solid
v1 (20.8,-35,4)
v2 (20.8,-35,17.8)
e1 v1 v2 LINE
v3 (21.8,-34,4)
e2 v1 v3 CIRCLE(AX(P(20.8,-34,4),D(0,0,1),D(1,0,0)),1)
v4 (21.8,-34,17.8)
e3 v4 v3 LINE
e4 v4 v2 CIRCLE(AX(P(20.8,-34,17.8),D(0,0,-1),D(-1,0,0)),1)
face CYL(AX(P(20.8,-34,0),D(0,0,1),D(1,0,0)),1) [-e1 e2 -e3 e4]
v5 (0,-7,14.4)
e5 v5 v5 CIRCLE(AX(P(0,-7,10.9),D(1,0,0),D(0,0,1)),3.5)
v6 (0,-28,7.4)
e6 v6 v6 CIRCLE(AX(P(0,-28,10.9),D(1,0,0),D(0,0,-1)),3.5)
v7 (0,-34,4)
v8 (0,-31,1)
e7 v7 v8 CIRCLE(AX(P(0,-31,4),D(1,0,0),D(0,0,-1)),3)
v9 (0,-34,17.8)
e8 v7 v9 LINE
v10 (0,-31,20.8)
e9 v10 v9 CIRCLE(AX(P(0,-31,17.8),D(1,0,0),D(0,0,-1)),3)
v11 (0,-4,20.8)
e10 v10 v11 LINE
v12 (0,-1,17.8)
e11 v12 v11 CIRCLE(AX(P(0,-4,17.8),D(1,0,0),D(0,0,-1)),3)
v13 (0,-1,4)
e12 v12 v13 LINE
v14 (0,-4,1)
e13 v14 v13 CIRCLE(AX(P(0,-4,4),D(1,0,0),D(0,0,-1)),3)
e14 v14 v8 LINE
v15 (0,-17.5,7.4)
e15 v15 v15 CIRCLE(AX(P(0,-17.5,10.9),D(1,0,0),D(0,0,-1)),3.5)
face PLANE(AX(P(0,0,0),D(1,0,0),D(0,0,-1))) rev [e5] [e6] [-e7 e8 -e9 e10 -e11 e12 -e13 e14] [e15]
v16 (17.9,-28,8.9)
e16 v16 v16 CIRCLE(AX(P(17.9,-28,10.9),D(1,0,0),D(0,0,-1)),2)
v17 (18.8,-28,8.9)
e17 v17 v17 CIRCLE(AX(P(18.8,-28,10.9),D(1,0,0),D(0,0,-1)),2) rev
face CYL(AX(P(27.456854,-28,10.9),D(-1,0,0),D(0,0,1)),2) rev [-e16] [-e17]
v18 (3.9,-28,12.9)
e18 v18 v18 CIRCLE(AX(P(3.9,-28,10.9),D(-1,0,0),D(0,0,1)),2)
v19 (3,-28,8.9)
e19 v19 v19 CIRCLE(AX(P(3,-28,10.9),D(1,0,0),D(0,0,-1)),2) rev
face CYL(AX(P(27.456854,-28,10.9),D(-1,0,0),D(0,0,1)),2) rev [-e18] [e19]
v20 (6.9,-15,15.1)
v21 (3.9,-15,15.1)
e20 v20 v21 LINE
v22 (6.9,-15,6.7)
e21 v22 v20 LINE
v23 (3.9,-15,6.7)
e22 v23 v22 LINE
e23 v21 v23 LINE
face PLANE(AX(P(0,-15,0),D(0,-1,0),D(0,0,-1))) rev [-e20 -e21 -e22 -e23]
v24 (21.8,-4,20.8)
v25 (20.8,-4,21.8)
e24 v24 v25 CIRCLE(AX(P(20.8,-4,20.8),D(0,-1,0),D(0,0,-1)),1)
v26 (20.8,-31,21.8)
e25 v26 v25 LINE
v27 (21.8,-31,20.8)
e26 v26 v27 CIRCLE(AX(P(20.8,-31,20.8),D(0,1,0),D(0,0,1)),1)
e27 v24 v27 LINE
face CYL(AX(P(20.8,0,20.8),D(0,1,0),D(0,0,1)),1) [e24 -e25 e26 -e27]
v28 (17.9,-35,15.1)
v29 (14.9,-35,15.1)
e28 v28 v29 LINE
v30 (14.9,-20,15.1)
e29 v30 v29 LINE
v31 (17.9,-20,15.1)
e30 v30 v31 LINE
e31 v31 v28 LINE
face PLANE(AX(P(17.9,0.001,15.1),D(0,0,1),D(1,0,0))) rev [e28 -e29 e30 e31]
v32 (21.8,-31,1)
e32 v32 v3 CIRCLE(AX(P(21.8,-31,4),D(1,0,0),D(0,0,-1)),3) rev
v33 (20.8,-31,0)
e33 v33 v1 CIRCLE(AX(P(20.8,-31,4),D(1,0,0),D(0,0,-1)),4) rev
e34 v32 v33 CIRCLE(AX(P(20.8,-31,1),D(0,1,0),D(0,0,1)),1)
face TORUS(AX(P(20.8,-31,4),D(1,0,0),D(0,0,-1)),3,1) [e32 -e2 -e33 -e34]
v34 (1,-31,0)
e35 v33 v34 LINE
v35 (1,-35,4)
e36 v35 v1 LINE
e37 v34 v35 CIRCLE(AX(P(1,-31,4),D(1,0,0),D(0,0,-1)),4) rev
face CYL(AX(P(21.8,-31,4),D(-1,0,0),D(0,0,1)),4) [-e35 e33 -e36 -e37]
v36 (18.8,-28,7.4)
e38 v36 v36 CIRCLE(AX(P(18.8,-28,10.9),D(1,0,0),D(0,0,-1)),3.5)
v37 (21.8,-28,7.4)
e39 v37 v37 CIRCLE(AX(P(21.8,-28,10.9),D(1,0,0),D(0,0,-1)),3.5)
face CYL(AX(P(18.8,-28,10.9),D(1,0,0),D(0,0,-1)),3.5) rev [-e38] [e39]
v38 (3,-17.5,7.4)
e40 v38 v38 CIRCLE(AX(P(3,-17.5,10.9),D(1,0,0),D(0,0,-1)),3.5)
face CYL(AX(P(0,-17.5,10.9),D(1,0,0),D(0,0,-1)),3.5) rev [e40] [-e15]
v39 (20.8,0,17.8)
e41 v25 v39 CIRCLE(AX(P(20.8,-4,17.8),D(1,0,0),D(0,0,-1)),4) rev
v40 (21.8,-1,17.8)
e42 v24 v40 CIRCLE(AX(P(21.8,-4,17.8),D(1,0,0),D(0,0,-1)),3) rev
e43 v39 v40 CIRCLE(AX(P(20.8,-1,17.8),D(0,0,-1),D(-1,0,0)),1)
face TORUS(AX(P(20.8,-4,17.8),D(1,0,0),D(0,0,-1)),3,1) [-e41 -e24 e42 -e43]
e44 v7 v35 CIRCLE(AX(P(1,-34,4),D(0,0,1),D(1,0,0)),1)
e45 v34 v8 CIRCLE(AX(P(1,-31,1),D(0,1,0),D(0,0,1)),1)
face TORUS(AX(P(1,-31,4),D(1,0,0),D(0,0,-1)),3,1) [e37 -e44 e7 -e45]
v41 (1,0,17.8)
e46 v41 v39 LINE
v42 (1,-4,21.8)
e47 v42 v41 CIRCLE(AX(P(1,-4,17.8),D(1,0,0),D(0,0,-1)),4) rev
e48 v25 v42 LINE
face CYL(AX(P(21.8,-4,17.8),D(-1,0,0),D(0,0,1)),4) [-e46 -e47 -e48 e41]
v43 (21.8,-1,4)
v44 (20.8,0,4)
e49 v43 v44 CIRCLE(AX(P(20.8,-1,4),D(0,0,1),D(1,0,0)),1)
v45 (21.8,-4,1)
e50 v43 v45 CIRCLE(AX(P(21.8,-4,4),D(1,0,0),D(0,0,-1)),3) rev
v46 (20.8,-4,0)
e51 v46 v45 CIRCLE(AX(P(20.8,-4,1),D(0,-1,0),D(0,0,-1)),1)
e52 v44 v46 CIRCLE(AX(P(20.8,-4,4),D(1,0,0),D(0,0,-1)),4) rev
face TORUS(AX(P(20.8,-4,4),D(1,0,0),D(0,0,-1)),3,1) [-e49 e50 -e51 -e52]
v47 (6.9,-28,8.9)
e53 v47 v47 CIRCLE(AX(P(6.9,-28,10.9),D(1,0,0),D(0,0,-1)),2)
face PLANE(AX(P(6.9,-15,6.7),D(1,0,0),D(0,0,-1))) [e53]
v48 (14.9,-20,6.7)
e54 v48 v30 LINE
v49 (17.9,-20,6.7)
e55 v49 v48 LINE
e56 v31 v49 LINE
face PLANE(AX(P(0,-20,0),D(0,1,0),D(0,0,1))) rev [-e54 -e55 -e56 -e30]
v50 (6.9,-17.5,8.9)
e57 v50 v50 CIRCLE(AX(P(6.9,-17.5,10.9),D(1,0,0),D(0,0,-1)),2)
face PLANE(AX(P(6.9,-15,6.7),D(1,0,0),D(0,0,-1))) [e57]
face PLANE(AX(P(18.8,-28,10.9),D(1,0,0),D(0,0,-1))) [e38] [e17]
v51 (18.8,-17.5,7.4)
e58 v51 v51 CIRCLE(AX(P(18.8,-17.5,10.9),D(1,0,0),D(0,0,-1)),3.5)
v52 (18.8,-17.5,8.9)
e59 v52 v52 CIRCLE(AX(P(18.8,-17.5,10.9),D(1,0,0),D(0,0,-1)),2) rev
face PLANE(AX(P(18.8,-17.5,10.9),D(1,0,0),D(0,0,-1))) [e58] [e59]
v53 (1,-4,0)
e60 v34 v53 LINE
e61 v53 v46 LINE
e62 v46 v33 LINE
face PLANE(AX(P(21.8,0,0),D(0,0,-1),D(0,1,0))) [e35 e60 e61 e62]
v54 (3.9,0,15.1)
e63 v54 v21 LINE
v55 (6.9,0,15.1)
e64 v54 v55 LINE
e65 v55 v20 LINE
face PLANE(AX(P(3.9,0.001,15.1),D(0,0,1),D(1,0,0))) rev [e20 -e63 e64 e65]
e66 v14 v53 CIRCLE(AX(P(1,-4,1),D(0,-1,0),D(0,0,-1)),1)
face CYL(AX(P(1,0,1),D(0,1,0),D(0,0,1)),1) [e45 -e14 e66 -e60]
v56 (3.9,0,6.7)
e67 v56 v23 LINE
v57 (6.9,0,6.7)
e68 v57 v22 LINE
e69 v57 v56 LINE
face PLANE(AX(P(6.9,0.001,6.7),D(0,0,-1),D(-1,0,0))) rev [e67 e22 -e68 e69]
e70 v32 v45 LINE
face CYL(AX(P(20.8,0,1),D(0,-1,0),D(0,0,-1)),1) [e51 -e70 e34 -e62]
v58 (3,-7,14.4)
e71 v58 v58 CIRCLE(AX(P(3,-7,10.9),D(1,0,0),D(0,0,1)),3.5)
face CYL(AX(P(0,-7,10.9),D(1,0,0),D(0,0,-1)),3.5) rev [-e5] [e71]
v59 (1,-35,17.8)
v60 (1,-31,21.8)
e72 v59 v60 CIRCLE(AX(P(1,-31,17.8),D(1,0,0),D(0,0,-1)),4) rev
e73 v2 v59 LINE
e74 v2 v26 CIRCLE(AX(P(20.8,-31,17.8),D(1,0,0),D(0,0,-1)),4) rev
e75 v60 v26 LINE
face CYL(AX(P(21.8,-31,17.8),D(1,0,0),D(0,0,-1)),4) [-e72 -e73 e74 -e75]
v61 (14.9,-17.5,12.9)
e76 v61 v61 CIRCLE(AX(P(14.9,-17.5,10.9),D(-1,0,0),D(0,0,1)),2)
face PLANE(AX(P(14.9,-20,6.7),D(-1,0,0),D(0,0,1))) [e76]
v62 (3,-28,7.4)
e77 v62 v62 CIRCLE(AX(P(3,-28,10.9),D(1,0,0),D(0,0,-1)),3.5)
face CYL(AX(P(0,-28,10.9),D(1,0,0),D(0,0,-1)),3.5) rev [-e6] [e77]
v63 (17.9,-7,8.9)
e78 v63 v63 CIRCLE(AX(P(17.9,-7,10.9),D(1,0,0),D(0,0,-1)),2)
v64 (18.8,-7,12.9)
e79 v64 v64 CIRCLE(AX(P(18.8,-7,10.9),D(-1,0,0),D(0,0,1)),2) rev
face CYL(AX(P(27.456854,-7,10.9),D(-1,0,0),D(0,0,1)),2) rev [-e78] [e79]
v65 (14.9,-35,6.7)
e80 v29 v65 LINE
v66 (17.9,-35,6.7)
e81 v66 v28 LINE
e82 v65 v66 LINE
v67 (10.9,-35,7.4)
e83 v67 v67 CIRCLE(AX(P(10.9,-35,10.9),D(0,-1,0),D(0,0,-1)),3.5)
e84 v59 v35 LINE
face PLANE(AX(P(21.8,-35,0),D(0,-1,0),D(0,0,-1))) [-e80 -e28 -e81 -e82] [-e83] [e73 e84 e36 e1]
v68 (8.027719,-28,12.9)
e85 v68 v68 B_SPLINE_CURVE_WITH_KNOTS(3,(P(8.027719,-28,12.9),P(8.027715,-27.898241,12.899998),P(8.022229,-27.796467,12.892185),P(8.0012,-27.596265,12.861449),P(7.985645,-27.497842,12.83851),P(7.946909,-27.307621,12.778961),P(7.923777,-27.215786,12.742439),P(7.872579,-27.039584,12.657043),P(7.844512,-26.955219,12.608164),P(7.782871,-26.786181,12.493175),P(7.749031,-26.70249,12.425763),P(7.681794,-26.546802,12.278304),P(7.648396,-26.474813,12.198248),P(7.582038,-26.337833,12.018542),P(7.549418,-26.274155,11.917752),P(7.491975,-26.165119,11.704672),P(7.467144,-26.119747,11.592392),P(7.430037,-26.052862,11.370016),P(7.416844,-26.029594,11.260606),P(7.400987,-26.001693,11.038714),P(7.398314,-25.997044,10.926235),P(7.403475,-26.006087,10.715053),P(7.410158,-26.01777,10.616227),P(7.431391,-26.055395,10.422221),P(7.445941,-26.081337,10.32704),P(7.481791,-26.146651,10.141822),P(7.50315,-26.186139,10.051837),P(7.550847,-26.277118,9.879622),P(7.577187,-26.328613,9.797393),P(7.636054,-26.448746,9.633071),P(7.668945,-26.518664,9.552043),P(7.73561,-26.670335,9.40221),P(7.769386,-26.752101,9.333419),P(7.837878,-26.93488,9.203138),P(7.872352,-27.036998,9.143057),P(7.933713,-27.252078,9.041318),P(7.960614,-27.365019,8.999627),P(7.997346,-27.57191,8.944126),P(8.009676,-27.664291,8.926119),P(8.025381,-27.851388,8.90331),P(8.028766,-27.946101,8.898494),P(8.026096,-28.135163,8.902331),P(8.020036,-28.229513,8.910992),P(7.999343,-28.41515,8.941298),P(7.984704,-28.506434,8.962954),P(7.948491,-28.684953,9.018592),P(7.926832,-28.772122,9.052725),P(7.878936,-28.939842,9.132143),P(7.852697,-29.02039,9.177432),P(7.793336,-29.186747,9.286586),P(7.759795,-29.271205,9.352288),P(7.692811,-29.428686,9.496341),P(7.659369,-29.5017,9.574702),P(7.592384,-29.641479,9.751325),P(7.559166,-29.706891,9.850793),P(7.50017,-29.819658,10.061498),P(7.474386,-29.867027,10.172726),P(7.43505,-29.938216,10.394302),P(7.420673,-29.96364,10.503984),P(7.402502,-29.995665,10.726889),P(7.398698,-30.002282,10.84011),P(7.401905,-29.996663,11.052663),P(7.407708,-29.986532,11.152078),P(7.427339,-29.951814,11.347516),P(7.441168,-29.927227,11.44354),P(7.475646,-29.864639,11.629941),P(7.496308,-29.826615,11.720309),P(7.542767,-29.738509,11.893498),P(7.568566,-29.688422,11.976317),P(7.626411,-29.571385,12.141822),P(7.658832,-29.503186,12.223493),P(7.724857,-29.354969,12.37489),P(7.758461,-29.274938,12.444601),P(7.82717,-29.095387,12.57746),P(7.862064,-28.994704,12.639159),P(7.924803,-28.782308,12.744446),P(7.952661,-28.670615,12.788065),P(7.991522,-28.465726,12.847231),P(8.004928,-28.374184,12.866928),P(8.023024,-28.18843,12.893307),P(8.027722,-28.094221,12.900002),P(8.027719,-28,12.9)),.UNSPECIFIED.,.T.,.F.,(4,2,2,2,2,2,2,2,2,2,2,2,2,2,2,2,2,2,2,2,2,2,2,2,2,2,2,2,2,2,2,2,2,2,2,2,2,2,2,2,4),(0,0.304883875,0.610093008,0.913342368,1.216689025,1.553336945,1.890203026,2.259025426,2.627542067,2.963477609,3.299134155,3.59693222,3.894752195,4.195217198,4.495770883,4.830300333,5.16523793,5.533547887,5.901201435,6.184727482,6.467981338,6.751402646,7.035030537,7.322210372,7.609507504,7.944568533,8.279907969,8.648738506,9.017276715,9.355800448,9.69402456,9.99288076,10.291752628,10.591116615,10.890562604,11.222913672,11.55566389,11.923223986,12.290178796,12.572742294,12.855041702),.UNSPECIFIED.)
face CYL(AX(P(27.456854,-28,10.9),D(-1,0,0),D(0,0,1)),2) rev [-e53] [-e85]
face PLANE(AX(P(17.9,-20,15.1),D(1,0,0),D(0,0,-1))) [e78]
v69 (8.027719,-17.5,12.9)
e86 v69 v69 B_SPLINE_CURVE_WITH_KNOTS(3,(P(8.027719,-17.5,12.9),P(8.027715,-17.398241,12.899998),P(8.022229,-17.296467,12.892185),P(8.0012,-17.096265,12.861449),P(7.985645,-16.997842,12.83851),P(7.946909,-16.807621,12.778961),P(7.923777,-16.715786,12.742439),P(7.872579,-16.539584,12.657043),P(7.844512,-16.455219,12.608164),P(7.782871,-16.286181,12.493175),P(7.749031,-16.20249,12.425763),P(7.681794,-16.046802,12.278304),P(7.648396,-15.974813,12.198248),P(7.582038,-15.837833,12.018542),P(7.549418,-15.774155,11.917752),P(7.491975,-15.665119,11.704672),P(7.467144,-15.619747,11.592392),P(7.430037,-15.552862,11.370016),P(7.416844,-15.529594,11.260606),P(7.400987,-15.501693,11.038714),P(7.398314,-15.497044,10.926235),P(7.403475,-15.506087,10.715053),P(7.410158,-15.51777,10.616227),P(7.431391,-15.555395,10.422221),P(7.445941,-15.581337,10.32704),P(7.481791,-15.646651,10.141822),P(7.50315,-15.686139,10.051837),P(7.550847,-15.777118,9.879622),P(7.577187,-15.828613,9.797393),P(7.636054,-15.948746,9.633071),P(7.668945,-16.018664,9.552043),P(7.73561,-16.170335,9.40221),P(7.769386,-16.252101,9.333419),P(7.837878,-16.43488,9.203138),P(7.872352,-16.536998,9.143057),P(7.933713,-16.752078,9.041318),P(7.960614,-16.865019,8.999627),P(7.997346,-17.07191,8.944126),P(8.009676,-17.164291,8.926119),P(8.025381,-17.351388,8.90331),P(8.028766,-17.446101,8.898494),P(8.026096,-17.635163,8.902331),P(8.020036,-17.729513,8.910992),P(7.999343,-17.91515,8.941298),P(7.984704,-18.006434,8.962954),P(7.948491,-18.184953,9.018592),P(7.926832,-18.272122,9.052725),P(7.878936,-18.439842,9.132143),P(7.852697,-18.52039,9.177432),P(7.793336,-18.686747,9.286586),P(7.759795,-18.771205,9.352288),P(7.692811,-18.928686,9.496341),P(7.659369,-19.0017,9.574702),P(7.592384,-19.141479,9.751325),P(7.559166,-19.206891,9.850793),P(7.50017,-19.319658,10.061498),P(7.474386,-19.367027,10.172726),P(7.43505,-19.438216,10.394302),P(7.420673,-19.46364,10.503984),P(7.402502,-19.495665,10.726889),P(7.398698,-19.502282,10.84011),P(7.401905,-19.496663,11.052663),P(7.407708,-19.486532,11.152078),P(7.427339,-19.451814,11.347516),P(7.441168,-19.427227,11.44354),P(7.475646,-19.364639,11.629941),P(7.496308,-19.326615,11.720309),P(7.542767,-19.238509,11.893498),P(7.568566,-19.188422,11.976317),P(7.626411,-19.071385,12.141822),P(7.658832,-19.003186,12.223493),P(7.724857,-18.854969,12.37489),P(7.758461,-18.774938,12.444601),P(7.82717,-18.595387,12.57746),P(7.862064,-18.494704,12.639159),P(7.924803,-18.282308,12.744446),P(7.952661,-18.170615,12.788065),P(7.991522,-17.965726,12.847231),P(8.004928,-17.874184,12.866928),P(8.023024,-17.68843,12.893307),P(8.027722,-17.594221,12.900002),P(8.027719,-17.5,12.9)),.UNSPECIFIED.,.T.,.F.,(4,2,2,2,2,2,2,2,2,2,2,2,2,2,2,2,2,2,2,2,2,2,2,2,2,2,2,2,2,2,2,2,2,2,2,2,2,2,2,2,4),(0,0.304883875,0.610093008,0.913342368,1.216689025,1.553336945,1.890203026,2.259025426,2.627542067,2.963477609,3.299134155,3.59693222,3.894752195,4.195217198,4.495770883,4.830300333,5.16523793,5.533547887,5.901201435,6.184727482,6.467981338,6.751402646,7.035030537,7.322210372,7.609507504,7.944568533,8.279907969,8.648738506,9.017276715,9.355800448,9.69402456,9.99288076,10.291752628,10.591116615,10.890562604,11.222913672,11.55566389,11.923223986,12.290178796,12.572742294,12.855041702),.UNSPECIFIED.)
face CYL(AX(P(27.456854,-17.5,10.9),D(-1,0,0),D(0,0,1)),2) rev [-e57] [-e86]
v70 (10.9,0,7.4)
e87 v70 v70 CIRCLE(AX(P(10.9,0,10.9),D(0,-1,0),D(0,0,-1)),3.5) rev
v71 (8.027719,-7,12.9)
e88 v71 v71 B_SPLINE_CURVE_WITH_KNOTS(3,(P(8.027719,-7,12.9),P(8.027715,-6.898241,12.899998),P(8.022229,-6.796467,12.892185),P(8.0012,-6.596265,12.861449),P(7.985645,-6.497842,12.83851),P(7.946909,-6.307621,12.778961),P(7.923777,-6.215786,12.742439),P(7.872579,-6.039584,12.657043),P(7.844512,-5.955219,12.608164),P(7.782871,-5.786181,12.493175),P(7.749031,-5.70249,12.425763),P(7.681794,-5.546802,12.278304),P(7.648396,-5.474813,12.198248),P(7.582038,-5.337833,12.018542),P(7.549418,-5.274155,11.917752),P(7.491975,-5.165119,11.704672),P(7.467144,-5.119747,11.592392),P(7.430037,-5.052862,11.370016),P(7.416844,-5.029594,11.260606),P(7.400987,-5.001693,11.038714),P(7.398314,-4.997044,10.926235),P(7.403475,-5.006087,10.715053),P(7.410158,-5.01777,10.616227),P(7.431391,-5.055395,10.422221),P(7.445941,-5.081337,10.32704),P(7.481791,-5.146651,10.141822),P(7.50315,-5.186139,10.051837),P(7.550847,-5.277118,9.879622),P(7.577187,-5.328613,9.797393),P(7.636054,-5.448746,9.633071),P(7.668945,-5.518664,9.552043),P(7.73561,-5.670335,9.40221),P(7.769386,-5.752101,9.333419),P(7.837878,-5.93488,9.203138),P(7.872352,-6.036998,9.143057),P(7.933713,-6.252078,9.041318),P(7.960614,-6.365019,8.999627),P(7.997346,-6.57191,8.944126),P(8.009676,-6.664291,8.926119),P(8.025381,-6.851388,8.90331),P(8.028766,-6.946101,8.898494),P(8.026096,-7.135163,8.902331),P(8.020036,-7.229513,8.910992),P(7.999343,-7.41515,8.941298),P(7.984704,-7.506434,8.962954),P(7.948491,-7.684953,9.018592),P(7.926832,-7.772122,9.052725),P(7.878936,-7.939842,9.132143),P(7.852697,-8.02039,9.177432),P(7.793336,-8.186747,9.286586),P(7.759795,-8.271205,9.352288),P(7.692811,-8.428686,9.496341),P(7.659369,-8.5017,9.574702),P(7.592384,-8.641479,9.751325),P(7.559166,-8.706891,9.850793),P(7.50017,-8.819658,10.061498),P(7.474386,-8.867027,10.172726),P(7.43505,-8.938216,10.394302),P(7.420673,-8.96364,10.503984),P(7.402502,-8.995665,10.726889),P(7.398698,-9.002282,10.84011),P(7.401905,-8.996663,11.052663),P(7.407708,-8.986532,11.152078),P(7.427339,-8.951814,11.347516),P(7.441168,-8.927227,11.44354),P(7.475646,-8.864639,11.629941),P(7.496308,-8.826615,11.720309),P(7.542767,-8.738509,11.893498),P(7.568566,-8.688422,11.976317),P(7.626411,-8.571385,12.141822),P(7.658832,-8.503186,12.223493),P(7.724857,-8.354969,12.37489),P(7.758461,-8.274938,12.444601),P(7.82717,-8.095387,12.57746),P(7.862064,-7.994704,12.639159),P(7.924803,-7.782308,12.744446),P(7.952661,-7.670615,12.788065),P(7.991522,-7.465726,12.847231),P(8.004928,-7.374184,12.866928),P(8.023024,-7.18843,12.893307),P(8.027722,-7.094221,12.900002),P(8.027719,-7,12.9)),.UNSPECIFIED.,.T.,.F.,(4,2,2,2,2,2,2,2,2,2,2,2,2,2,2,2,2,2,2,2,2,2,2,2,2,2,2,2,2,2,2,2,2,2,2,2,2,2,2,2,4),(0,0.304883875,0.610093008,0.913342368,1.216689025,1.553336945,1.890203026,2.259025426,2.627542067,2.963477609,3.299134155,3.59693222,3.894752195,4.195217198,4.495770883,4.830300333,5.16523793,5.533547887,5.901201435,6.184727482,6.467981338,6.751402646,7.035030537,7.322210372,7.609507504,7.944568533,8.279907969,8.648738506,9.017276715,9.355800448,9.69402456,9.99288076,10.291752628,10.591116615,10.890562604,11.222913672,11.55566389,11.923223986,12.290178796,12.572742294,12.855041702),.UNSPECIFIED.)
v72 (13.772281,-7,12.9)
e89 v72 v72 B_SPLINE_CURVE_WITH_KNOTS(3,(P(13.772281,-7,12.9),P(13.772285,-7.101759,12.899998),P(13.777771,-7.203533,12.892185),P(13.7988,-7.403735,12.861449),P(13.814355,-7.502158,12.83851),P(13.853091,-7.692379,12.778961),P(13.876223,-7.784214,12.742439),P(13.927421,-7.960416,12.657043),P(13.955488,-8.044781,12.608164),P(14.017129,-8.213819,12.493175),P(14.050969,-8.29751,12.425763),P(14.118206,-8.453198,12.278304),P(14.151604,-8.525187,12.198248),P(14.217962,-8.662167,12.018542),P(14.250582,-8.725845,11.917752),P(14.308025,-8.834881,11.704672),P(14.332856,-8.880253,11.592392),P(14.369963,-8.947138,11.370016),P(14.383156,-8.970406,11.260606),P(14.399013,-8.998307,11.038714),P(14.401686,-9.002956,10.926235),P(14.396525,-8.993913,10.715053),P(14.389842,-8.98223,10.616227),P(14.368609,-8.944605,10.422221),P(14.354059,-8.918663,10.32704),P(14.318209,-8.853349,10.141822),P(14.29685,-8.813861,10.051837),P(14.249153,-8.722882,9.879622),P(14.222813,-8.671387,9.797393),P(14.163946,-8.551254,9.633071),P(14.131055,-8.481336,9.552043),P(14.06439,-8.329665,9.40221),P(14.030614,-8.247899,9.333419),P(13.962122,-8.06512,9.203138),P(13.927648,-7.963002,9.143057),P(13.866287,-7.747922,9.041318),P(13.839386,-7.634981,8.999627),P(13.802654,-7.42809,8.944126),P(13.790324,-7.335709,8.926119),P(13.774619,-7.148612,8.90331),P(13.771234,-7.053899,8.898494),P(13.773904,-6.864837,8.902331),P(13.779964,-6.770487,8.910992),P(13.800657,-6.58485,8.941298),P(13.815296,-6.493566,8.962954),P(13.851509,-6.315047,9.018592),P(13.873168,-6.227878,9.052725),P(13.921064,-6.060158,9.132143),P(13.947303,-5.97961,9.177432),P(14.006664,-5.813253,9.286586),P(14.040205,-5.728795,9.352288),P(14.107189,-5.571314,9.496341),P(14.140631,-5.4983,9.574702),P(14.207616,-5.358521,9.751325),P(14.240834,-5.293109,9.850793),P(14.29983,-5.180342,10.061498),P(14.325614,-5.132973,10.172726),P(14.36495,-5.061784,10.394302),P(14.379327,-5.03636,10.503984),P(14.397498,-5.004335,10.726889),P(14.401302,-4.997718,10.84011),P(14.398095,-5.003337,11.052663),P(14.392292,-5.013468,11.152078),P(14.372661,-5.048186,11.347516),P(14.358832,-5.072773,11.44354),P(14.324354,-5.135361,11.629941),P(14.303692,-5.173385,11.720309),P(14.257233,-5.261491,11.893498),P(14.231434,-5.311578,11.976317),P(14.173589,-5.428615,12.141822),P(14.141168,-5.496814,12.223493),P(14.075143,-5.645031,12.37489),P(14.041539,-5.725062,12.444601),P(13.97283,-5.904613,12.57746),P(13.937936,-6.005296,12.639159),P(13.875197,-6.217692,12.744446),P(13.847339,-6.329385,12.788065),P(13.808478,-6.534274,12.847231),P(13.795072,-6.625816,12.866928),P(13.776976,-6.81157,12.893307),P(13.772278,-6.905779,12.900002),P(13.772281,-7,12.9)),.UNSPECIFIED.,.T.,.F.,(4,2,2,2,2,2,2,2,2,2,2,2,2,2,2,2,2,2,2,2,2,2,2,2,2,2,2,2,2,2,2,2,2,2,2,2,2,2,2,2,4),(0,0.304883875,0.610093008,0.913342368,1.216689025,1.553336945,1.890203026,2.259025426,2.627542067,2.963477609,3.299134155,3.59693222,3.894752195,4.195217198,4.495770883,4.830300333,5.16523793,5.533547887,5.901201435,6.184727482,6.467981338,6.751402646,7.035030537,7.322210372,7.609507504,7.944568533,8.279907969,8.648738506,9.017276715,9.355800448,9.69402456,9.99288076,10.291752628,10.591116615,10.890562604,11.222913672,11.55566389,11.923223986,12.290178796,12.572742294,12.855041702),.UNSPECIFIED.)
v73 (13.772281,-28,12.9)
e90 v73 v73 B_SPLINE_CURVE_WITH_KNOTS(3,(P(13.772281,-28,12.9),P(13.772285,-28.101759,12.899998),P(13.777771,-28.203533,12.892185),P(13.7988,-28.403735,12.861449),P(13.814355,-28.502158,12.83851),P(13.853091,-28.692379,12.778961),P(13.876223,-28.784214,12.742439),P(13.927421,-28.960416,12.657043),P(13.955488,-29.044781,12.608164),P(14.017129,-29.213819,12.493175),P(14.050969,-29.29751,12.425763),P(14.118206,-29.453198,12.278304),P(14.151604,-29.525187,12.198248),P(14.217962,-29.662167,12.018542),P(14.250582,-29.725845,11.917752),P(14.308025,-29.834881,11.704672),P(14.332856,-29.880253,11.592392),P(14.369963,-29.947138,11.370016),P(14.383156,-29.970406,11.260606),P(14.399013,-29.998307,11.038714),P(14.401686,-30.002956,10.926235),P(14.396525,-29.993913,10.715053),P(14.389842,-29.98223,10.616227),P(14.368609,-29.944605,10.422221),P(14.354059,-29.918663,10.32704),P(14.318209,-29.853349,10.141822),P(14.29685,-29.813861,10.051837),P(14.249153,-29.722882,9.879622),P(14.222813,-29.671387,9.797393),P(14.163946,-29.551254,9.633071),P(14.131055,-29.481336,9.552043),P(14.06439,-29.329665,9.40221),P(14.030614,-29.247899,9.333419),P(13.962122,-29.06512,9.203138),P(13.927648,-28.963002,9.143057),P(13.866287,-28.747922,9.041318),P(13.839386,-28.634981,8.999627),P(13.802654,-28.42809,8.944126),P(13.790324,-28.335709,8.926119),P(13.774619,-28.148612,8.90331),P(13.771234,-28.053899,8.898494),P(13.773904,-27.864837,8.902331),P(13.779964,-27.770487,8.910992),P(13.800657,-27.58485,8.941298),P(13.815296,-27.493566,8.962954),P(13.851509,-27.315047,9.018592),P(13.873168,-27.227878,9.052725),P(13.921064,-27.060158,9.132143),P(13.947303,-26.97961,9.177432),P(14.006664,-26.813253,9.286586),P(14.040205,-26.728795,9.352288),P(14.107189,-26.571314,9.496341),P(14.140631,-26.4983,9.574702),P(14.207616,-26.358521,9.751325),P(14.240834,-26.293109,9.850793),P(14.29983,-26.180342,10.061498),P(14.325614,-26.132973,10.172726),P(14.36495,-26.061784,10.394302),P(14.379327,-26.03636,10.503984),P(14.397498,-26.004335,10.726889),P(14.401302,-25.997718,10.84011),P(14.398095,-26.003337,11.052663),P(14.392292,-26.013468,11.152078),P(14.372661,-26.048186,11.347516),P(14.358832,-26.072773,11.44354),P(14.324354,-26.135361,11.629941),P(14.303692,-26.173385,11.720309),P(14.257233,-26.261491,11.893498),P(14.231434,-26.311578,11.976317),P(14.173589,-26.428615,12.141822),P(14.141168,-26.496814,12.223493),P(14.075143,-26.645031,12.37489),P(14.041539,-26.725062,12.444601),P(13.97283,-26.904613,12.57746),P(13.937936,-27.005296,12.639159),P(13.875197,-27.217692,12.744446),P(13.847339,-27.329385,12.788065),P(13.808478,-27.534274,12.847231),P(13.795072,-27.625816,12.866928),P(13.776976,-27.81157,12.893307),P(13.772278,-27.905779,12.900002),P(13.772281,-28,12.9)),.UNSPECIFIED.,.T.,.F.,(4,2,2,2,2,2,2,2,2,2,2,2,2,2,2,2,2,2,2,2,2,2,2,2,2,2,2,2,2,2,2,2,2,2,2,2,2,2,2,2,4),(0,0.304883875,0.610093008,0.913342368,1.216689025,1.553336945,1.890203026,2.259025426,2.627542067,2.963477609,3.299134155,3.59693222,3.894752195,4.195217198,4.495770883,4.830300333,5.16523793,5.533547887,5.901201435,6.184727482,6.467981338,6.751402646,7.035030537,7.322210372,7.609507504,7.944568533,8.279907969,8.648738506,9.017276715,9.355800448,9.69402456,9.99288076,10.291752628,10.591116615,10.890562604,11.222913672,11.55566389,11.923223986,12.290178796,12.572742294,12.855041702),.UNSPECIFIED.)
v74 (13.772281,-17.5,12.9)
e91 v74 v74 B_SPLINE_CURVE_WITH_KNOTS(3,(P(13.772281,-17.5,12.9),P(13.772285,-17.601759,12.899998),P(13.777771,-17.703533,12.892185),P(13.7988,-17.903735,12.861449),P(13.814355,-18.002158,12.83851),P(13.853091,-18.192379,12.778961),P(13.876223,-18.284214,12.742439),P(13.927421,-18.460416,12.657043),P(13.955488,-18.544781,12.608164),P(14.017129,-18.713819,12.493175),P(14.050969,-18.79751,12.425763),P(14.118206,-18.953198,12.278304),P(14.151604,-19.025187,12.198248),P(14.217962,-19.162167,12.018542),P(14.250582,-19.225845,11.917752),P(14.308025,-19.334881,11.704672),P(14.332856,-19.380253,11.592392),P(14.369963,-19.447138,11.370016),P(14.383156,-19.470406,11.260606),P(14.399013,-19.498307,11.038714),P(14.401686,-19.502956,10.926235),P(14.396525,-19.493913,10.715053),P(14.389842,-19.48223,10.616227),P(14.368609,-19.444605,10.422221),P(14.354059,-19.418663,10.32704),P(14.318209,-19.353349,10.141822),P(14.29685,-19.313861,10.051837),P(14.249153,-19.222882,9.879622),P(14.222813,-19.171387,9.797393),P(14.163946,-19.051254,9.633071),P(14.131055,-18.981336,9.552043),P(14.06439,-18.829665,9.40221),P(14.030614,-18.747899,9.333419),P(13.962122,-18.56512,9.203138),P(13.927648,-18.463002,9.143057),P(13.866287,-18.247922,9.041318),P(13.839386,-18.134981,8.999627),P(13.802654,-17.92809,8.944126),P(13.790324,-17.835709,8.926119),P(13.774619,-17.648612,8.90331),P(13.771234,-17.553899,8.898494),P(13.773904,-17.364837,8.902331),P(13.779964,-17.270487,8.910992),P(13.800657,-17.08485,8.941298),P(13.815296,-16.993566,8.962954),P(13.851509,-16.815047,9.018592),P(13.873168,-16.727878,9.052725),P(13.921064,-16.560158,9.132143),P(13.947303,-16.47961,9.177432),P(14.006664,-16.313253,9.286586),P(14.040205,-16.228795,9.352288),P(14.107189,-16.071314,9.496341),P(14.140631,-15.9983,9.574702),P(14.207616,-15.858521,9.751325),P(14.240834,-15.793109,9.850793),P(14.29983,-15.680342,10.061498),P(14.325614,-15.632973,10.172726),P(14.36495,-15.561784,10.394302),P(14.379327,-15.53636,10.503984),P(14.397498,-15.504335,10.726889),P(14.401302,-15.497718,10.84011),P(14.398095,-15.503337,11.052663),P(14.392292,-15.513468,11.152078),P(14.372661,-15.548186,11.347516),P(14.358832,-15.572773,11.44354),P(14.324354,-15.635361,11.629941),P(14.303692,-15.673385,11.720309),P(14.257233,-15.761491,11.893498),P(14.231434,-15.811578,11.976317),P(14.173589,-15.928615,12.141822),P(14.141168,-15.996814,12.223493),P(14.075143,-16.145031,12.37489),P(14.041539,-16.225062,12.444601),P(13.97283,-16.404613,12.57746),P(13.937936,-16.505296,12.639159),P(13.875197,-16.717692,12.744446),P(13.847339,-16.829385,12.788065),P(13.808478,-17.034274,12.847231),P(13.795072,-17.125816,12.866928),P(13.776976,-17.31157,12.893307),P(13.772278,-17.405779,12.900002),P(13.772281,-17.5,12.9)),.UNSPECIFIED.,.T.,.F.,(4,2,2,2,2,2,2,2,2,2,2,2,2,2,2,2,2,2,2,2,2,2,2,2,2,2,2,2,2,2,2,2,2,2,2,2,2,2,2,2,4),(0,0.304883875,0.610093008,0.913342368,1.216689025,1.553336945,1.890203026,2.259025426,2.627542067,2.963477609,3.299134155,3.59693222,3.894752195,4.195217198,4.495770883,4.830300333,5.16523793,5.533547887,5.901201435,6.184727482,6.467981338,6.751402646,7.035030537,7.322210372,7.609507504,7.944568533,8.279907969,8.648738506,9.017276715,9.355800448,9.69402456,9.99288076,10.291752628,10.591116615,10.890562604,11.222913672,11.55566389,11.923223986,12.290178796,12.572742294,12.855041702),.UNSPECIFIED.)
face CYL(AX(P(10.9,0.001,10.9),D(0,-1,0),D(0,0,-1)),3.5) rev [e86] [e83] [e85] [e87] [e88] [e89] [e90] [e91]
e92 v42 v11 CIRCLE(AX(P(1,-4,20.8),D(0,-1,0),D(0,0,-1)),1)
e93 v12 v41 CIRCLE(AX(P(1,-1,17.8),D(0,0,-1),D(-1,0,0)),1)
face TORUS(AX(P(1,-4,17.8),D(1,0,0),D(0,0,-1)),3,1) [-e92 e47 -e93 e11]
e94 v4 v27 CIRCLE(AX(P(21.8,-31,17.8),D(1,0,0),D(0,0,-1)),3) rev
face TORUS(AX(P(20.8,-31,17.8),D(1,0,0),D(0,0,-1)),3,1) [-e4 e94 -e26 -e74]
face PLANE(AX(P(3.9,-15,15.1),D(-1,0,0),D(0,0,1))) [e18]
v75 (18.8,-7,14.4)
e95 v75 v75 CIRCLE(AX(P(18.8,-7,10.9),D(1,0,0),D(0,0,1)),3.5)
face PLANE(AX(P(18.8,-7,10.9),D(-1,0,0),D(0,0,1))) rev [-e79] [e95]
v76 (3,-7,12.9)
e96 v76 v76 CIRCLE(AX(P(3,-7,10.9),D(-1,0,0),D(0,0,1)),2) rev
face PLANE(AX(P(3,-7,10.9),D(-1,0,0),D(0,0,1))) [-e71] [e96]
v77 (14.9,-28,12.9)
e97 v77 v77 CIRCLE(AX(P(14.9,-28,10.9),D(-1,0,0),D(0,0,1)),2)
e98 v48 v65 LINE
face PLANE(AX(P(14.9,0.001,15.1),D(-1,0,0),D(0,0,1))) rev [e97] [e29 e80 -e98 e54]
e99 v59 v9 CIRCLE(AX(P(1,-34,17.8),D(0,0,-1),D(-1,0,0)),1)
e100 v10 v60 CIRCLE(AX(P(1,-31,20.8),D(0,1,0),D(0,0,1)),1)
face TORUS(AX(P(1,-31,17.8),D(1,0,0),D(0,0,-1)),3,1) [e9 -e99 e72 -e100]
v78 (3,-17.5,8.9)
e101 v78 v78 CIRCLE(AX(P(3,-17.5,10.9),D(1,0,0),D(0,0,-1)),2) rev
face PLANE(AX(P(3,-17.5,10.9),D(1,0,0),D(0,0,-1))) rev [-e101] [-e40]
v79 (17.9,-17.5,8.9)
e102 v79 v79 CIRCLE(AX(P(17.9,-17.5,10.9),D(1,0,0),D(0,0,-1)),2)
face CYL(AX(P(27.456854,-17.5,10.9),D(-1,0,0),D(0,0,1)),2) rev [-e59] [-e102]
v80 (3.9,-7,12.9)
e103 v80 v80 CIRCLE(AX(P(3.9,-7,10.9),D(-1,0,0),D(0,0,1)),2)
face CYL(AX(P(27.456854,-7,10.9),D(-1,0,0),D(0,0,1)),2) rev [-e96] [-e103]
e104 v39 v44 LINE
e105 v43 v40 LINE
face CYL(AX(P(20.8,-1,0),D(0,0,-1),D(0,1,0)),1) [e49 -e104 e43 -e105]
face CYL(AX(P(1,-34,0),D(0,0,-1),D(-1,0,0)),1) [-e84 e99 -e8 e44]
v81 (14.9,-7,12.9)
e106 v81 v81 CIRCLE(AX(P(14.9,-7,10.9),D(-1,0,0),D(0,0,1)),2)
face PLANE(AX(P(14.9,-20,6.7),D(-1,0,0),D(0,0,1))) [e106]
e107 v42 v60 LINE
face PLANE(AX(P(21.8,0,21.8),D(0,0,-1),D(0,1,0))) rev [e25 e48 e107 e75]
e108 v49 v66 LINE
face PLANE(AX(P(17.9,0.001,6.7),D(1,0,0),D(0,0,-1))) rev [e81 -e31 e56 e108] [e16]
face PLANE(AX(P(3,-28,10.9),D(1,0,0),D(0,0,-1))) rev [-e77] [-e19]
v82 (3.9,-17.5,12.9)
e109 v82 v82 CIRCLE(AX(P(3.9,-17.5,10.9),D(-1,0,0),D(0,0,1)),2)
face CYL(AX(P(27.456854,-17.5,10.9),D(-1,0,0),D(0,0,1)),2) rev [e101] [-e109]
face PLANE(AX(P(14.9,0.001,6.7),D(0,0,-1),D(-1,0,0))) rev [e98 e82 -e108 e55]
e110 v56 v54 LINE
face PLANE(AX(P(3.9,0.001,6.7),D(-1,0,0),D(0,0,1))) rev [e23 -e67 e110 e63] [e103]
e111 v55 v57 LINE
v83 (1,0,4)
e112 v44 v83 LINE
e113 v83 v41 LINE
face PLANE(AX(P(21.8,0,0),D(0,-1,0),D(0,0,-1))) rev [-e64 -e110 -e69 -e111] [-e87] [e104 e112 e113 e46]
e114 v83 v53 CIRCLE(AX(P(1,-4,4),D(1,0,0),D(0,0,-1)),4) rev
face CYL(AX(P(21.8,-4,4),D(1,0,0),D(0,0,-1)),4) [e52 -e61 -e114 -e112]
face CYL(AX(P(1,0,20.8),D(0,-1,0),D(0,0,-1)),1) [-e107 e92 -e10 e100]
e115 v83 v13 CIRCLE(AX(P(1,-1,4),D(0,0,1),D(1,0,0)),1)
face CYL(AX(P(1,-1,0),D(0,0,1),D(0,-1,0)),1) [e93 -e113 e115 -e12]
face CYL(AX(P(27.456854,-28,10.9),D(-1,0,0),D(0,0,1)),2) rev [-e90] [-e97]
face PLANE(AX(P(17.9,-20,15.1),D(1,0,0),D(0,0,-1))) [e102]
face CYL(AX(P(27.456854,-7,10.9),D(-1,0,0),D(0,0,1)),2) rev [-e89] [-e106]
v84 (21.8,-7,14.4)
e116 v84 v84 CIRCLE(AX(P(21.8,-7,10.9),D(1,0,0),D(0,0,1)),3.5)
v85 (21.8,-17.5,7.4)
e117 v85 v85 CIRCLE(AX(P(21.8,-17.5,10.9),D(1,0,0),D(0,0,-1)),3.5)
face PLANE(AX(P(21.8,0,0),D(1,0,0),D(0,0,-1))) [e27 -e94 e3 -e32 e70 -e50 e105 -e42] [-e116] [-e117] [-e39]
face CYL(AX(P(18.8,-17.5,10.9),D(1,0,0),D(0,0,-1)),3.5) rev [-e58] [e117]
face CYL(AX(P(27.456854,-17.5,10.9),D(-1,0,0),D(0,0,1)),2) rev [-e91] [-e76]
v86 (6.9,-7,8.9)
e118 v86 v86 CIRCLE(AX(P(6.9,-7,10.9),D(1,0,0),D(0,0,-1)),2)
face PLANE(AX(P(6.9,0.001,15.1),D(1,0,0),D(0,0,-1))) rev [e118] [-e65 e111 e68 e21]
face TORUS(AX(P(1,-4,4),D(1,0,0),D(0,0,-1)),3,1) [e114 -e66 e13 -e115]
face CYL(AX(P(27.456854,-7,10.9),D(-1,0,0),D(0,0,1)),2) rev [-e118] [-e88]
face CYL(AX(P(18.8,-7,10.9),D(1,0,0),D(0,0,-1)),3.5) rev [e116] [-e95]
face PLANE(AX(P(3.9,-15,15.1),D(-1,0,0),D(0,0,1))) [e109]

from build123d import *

# Parameters (mm, degrees)
CROQUIS1_W              = 21.8
CROQUIS1_H              = 35
SALIENTE_EXTRUIR1_DEPTH = 21.8
CROQUIS6_R              = 2
CORTAR_EXTRUIR2_DEPTH   = 21.8
REDONDEO2_R             = 1
REDONDEO3_R             = 4
CROQUIS7_R              = 3.5
CORTAR_EXTRUIR3_DEPTH   = 3
CORTAR_EXTRUIR4_REACH   = 48.642
CROQUIS11_R             = 3.5
CROQUIS11_W             = 3
CROQUIS11_H             = 8.4
MATRIZL1_COUNT          = 2
MATRIZL1_PITCH          = 18.8
CROQUIS14_W             = 3
CROQUIS14_H             = 8.4
SALIENTE_EXTRUIR2_DEPTH = 20
CROQUIS15_W             = 3
CROQUIS15_H             = 8.4
SALIENTE_EXTRUIR3_DEPTH = 20


with BuildPart() as part:
    # Croquis1 → Saliente-Extruir1 (new body)
    with BuildSketch(Plane(origin=(0, 0, 0), x_dir=(0, 0, -1), z_dir=(1, 0, 0))):
        with Locations((-10.9, -17.5)):
            Rectangle(CROQUIS1_W, CROQUIS1_H)
    extrude(amount=SALIENTE_EXTRUIR1_DEPTH)

    # Croquis6 → Cortar-Extruir2 (cut)
    with BuildSketch(Plane.ZY):
        with Locations((10.9, -28)):
            Circle(CROQUIS6_R)
        with Locations((10.9, -17.5)):
            Circle(CROQUIS6_R)
        with Locations(Location((10.9, -7, 0), (0, 0, 180))):
            Circle(CROQUIS6_R)
    extrude(amount=-CORTAR_EXTRUIR2_DEPTH, mode=Mode.SUBTRACT)

    # Redondeo2
    redondeo2_edges = [part.edges().sort_by_distance(p)[0] for p in [
        (21.8, -35, 10.9),
        (21.8, -17.5, 0),
        (21.8, 0, 10.9),
        (0, -17.5, 0),
        (0, -35, 10.9),
        (0, -17.5, 21.8),
        (0, 0, 10.9),
        (21.8, -17.5, 21.8),
    ]]
    fillet(redondeo2_edges, radius=REDONDEO2_R)

    # Redondeo3
    # the kernel refuses this fillet: 4 mm, written as the material it takes off along each edge
    with BuildSketch(Plane(origin=(0, -4, 4), x_dir=(0, 1, 0), z_dir=(0, 0, 1))) as redondeo3_piece_1:
        with BuildLine():
            CenterArc((3, -1), 1, 0, 90)
            Line((4, -1), (4, 0))
            Line((4, 0), (3, 0))
        make_face()
    revolve(axis=Axis((0, -4, 4), (-1, 0, 0)), revolution_arc=90, mode=Mode.SUBTRACT)
    with BuildSketch(Plane(origin=(0, -31, 4), x_dir=(0, 0, -1), z_dir=(0, 1, 0))) as redondeo3_piece_2:
        with BuildLine():
            CenterArc((3, -1), 1, 0, 90)
            Line((4, -1), (4, 0))
            Line((4, 0), (3, 0))
        make_face()
    revolve(axis=Axis((0, -31, 4), (-1, 0, 0)), revolution_arc=90, mode=Mode.SUBTRACT)
    with BuildSketch(Plane(origin=(0, -4, 17.8), x_dir=(0, 0, 1), z_dir=(0, -1, 0))) as redondeo3_piece_3:
        with BuildLine():
            CenterArc((3, -1), 1, 0, 90)
            Line((4, -1), (4, 0))
            Line((4, 0), (3, 0))
        make_face()
    revolve(axis=Axis((0, -4, 17.8), (-1, 0, 0)), revolution_arc=90, mode=Mode.SUBTRACT)
    with BuildSketch(Plane(origin=(0, -31, 17.8), x_dir=(0, -1, 0), z_dir=(0, 0, -1))) as redondeo3_piece_4:
        with BuildLine():
            CenterArc((3, -1), 1, 0, 90)
            Line((4, -1), (4, 0))
            Line((4, 0), (3, 0))
        make_face()
    revolve(axis=Axis((0, -31, 17.8), (-1, 0, 0)), revolution_arc=90, mode=Mode.SUBTRACT)
    with BuildSketch(Plane(origin=(21.8, -4, 4), x_dir=(0, 0, -1), z_dir=(0, -1, 0))) as redondeo3_piece_5:
        with BuildLine():
            CenterArc((3, -1), 1, 0, 90)
            Line((4, -1), (4, 0))
            Line((4, 0), (3, 0))
        make_face()
    revolve(axis=Axis((21.8, -4, 4), (1, 0, 0)), revolution_arc=90, mode=Mode.SUBTRACT)
    with BuildSketch(Plane(origin=(21.8, -31, 4), x_dir=(0, -1, 0), z_dir=(0, 0, 1))) as redondeo3_piece_6:
        with BuildLine():
            CenterArc((3, -1), 1, 0, 90)
            Line((4, -1), (4, 0))
            Line((4, 0), (3, 0))
        make_face()
    revolve(axis=Axis((21.8, -31, 4), (1, 0, 0)), revolution_arc=90, mode=Mode.SUBTRACT)
    with BuildSketch(Plane(origin=(21.8, -4, 17.8), x_dir=(0, 1, 0), z_dir=(0, 0, -1))) as redondeo3_piece_7:
        with BuildLine():
            CenterArc((3, -1), 1, 0, 90)
            Line((4, -1), (4, 0))
            Line((4, 0), (3, 0))
        make_face()
    revolve(axis=Axis((21.8, -4, 17.8), (1, 0, 0)), revolution_arc=90, mode=Mode.SUBTRACT)
    with BuildSketch(Plane(origin=(21.8, -31, 17.8), x_dir=(0, 0, 1), z_dir=(0, 1, 0))) as redondeo3_piece_8:
        with BuildLine():
            CenterArc((3, -1), 1, 0, 90)
            Line((4, -1), (4, 0))
            Line((4, 0), (3, 0))
        make_face()
    revolve(axis=Axis((21.8, -31, 17.8), (1, 0, 0)), revolution_arc=90, mode=Mode.SUBTRACT)
    with BuildSketch(Plane(origin=(0, -35, 21.8), x_dir=(0, 1, 0), z_dir=(1, 0, 0)), Plane(origin=(0, 0, 21.8), x_dir=(0, 0, -1), z_dir=(1, 0, 0))) as redondeo3_piece_9:
        with BuildLine():
            CenterArc((REDONDEO3_R, -REDONDEO3_R), REDONDEO3_R, 90, 90)
            Line((0, -REDONDEO3_R), (0, 0))
            Line((0, 0), (REDONDEO3_R, 0))
        make_face()
    extrude(amount=21.8, mode=Mode.SUBTRACT)
    with BuildSketch(Plane(origin=(0, 0, 0), x_dir=(0, 0, 1), z_dir=(1, 0, 0)), Plane(origin=(0, -35, 0), x_dir=(0, 1, 0), z_dir=(1, 0, 0))) as redondeo3_piece_10:
        with BuildLine():
            CenterArc((REDONDEO3_R, REDONDEO3_R), REDONDEO3_R, 180, 90)
            Line((0, REDONDEO3_R), (0, 0))
            Line((0, 0), (REDONDEO3_R, 0))
        make_face()
    extrude(amount=21.8, mode=Mode.SUBTRACT)

    # Croquis7 → Cortar-Extruir3 (cut)
    with BuildSketch(Plane(origin=(21.8, 0, 0), x_dir=(0, 0, -1), z_dir=(1, 0, 0))):
        with Locations((-10.9, -28)):
            Circle(CROQUIS7_R)
        with Locations((-10.9, -17.5)):
            Circle(CROQUIS7_R)
        with Locations(Location((-10.9, -7, 0), (0, 0, 180))):
            Circle(CROQUIS7_R)
    cortar_extruir3 = extrude(amount=-CORTAR_EXTRUIR3_DEPTH, mode=Mode.SUBTRACT)

    # Croquis11 → Cortar-Extruir4 (cut, up to next)
    with BuildSketch(Plane.XZ.offset(35), mode=Mode.PRIVATE) as cortar_extruir4_sk1:
        with Locations(Location((10.9, 10.9, 0), (0, 0, 270))):
            Circle(CROQUIS11_R)
    cortar_extruir4_tool1 = extrude(cortar_extruir4_sk1.sketch, amount=-CORTAR_EXTRUIR4_REACH, mode=Mode.PRIVATE) & part.part
    # Croquis11 → Cortar-Extruir4 (cut, up to next)
    with BuildSketch(Plane.XZ.offset(35), mode=Mode.PRIVATE) as cortar_extruir4_sk2:
        with Locations((5.4, 10.9)):
            Rectangle(CROQUIS11_W, CROQUIS11_H)
    cortar_extruir4_tool2 = extrude(cortar_extruir4_sk2.sketch, amount=-CORTAR_EXTRUIR4_REACH, mode=Mode.PRIVATE) & part.part
    # Croquis11 → Cortar-Extruir4 (cut, up to next)
    with BuildSketch(Plane.XZ.offset(35), mode=Mode.PRIVATE) as cortar_extruir4_sk3:
        with Locations((16.4, 10.9)):
            Rectangle(CROQUIS11_W, CROQUIS11_H)
    cortar_extruir4_tool3 = extrude(cortar_extruir4_sk3.sketch, amount=-CORTAR_EXTRUIR4_REACH, mode=Mode.PRIVATE) & part.part
    add(cortar_extruir4_tool1.solids().sort_by_distance((10.9, -35, 10.9))[0], mode=Mode.SUBTRACT)
    add(cortar_extruir4_tool2.solids().sort_by_distance((5.4, -35, 10.9))[0], mode=Mode.SUBTRACT)
    add(cortar_extruir4_tool3.solids().sort_by_distance((16.4, -35, 10.9))[0], mode=Mode.SUBTRACT)

    # MatrizL1: Cortar-Extruir3 ×2
    with Locations(*[(-i * MATRIZL1_PITCH, 0, 0) for i in range(1, MATRIZL1_COUNT)]):
        add(cortar_extruir3, mode=Mode.SUBTRACT)

    # Croquis14 → Saliente-Extruir2 (add)
    with BuildSketch(Plane(origin=(0, 0, 0), x_dir=(1, 0, 0), z_dir=(0, 1, 0))):
        with Locations((16.4, -10.9)):
            Rectangle(CROQUIS14_W, CROQUIS14_H)
    extrude(amount=-SALIENTE_EXTRUIR2_DEPTH)

    # Croquis15 → Saliente-Extruir3 (add)
    with BuildSketch(Plane.XZ.offset(35)):
        with Locations((5.4, 10.9)):
            Rectangle(CROQUIS15_W, CROQUIS15_H)
    extrude(amount=-SALIENTE_EXTRUIR3_DEPTH)


solid = part.part
